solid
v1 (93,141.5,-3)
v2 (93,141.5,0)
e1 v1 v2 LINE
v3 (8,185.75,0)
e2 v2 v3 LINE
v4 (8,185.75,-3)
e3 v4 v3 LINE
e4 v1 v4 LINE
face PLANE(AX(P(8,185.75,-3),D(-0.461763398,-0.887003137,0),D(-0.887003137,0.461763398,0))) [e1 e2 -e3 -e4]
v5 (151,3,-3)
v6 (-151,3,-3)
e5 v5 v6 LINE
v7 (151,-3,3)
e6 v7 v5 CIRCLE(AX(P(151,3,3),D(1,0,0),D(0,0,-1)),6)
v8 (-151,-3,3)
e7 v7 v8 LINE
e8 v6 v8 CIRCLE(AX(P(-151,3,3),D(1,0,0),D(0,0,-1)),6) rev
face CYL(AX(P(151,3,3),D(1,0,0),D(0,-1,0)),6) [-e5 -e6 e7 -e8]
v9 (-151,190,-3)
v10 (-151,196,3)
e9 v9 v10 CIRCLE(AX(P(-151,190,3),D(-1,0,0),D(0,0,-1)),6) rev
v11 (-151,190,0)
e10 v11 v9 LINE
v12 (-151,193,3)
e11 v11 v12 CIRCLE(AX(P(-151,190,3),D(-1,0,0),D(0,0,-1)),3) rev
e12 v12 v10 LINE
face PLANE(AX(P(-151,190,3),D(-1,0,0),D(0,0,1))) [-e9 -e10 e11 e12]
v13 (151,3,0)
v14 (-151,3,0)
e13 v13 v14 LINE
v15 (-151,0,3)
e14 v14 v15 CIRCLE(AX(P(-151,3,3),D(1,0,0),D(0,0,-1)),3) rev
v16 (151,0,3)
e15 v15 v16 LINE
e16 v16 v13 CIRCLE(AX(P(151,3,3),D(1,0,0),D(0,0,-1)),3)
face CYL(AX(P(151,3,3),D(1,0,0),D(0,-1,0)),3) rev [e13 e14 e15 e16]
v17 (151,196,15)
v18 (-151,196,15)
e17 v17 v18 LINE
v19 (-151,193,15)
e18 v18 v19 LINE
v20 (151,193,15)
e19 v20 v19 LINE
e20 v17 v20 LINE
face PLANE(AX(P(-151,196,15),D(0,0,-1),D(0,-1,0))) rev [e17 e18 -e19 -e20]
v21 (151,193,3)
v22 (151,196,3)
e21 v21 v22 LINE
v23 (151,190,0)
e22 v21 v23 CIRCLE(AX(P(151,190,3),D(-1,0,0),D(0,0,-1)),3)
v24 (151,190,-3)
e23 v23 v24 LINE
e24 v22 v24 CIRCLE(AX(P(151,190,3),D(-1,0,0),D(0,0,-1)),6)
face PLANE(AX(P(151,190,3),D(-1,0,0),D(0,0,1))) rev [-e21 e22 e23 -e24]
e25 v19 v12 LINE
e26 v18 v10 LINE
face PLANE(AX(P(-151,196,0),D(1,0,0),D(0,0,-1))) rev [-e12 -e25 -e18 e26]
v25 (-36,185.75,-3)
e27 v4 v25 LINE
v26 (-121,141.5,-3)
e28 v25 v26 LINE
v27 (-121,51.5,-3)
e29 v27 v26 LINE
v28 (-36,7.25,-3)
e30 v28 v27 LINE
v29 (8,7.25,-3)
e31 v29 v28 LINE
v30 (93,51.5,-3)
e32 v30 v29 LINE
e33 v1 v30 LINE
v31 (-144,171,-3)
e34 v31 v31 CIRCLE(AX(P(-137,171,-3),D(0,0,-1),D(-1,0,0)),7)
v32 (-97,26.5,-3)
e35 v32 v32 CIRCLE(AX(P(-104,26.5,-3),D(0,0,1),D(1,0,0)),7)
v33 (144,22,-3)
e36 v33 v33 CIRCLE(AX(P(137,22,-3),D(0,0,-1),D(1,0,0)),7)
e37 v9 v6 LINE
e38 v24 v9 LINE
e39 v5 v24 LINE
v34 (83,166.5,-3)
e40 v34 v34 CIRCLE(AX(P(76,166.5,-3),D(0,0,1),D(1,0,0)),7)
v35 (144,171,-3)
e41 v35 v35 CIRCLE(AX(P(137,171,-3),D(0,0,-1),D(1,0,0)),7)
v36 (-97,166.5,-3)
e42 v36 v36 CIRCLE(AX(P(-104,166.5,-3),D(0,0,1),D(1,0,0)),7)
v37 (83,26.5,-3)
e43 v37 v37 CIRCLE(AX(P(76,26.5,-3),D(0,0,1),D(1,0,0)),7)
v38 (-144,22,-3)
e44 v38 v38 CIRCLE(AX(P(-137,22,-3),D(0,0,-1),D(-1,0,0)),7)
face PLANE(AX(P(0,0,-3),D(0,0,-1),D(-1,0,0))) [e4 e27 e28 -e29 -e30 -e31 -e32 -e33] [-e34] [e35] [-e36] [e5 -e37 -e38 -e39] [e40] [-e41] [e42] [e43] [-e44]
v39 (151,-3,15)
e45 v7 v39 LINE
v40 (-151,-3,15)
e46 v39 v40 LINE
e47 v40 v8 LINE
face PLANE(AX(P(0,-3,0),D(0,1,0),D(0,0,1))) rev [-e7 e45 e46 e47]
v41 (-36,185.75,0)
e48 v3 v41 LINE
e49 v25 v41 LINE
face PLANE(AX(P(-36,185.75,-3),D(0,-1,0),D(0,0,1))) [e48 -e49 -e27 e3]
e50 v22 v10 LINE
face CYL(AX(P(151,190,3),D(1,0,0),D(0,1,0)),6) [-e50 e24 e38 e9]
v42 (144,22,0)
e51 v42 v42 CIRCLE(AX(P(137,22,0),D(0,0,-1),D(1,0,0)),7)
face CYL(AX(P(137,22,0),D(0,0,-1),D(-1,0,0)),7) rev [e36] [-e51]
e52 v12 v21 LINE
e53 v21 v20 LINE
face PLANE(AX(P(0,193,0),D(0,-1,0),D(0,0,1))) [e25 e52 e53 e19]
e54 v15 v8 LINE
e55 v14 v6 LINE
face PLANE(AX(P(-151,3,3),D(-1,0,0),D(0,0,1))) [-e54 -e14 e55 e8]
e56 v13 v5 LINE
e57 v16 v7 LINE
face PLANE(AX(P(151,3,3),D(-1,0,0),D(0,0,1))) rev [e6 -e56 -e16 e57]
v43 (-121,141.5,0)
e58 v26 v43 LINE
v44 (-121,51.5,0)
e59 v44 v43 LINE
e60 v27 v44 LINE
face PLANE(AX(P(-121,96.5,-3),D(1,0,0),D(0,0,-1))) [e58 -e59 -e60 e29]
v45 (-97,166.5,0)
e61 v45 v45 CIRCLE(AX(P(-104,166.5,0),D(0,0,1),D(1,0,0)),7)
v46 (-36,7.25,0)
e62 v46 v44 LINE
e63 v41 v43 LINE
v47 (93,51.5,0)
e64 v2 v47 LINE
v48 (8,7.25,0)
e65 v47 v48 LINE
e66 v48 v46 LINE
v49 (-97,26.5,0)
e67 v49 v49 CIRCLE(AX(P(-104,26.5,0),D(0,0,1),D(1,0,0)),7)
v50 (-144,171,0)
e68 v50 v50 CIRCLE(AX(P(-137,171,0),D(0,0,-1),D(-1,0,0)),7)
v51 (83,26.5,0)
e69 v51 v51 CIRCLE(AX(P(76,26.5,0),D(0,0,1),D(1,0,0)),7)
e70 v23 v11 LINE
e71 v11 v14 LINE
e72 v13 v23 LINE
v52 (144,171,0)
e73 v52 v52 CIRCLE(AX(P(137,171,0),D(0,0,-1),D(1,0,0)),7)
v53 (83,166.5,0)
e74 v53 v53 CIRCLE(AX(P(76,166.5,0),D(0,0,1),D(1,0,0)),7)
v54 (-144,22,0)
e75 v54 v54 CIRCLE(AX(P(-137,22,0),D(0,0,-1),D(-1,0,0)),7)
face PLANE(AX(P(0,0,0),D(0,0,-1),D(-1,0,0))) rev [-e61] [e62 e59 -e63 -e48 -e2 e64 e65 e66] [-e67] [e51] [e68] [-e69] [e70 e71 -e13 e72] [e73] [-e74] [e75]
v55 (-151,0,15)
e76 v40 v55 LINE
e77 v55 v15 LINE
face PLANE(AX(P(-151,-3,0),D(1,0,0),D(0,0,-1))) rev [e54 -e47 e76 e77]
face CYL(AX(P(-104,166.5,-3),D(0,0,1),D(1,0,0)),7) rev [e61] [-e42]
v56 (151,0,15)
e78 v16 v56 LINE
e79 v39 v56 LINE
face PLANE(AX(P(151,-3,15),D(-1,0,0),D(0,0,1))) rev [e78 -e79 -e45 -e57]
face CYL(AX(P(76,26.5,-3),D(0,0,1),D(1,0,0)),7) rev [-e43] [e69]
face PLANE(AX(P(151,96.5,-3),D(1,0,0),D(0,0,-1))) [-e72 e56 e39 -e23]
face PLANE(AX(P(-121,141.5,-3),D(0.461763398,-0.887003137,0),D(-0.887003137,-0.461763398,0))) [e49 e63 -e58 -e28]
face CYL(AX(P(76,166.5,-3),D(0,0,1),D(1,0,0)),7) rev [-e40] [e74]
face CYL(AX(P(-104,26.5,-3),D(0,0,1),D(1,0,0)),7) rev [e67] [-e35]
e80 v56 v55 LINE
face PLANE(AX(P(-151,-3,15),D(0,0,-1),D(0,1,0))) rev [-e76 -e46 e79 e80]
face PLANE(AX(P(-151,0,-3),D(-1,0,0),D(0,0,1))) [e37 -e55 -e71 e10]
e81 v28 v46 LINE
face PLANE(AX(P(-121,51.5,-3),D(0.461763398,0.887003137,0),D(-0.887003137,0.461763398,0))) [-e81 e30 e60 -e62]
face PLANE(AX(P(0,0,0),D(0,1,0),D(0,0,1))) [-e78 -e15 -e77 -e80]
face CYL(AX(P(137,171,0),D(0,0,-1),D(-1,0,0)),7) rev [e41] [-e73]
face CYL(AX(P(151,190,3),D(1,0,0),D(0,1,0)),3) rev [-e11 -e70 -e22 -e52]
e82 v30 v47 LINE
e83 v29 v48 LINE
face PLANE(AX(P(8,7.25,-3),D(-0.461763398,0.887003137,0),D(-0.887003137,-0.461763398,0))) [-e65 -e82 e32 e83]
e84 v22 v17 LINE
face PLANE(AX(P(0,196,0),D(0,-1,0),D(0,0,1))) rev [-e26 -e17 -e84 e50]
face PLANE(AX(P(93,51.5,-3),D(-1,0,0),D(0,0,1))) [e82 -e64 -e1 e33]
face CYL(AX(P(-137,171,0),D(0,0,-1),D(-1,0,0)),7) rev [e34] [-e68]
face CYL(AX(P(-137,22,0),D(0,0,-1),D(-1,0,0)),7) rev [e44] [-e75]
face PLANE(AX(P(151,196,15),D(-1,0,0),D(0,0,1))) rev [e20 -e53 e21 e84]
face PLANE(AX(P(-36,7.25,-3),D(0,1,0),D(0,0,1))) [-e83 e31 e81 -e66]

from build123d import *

# Parameters (mm, degrees)
SM_BASE_FLANGE_1_DEPTH           = 3
SM_EDGE_FLANGE_1_STRIP_W         = 18
SM_EDGE_FLANGE_1_STRIP_H         = 3
SM_EDGE_FLANGE_1_STRIP_CUT_DEPTH = 302
SM_EDGE_FLANGE_1_DEPTH           = 302
SKETCH_9_R                       = 7
CUT_EXTRUDE_1_DEPTH              = 10
SKETCH_10_R                      = 7
CUT_EXTRUDE_2_DEPTH              = 3


# Sheet-metal steps are written as plain solids
with BuildPart() as part:
    # Sketch 1 → Базовая кромка1 (new body)
    with BuildSketch(Plane.XY):
        Polygon((-151, 0), (151, 0), (151, 96.5), (93, 96.5), (93, 51.5), (8, 7.25), (-36, 7.25), (-121, 51.5), (-121, 96.5), (-151, 96.5), align=None)
    extrude(amount=-SM_BASE_FLANGE_1_DEPTH)

    # Ребро-кромка1 strip (across the edge) → Ребро-кромка1 strip cut (cut)
    with BuildSketch(Plane.YZ.offset(-151)):
        with Locations((-6, -1.5)):
            Rectangle(SM_EDGE_FLANGE_1_STRIP_W, SM_EDGE_FLANGE_1_STRIP_H)
    extrude(amount=SM_EDGE_FLANGE_1_STRIP_CUT_DEPTH, mode=Mode.SUBTRACT)

    # Ребро-кромка1 section (across the edge) → Ребро-кромка1 (add)
    with BuildSketch(Plane.YZ.offset(-151)):
        with BuildLine():
            Line((-3, 3), (-3, 15))
            Line((-3, 15), (0, 15))
            Line((0, 15), (0, 3))
            ThreePointArc((0, 3), (0.878679656, 0.878679656), (3, 0))
            Line((3, 0), (3, -3))
            ThreePointArc((3, -3), (-1.242640687, -1.242640687), (-3, 3))
        make_face()
    extrude(amount=SM_EDGE_FLANGE_1_DEPTH)

    # Зеркальное отражение1: part across plane


with BuildPart() as part_1:
    add(part.part)
    add(part.part.mirror(Plane(origin=(-151, 96.5, -3), x_dir=(0, 0, 1), z_dir=(0, 1, 0))))

    # Эскиз9 → Вырез-Вытянуть1 (cut)
    with BuildSketch(Plane(origin=(0, 0, -3), x_dir=(-1, 0, 0), z_dir=(0, 0, -1))):
        with Locations((137, 171)):
            Circle(SKETCH_9_R)
        with Locations((137, 22)):
            Circle(SKETCH_9_R)
        with Locations(Location((-137, 22, 0), (0, 0, 180))):
            Circle(SKETCH_9_R)
        with Locations(Location((-137, 171, 0), (0, 0, 180))):
            Circle(SKETCH_9_R)
    extrude(amount=-CUT_EXTRUDE_1_DEPTH, mode=Mode.SUBTRACT)

    # Эскиз10 → Вырез-Вытянуть2 (cut)
    with BuildSketch(Plane.XY):
        with Locations((76, 166.5)):
            Circle(SKETCH_10_R)
        with Locations((-104, 166.5)):
            Circle(SKETCH_10_R)
        with Locations((-104, 26.5)):
            Circle(SKETCH_10_R)
        with Locations((76, 26.5)):
            Circle(SKETCH_10_R)
    extrude(amount=-CUT_EXTRUDE_2_DEPTH, mode=Mode.SUBTRACT)


solid = part_1.part
